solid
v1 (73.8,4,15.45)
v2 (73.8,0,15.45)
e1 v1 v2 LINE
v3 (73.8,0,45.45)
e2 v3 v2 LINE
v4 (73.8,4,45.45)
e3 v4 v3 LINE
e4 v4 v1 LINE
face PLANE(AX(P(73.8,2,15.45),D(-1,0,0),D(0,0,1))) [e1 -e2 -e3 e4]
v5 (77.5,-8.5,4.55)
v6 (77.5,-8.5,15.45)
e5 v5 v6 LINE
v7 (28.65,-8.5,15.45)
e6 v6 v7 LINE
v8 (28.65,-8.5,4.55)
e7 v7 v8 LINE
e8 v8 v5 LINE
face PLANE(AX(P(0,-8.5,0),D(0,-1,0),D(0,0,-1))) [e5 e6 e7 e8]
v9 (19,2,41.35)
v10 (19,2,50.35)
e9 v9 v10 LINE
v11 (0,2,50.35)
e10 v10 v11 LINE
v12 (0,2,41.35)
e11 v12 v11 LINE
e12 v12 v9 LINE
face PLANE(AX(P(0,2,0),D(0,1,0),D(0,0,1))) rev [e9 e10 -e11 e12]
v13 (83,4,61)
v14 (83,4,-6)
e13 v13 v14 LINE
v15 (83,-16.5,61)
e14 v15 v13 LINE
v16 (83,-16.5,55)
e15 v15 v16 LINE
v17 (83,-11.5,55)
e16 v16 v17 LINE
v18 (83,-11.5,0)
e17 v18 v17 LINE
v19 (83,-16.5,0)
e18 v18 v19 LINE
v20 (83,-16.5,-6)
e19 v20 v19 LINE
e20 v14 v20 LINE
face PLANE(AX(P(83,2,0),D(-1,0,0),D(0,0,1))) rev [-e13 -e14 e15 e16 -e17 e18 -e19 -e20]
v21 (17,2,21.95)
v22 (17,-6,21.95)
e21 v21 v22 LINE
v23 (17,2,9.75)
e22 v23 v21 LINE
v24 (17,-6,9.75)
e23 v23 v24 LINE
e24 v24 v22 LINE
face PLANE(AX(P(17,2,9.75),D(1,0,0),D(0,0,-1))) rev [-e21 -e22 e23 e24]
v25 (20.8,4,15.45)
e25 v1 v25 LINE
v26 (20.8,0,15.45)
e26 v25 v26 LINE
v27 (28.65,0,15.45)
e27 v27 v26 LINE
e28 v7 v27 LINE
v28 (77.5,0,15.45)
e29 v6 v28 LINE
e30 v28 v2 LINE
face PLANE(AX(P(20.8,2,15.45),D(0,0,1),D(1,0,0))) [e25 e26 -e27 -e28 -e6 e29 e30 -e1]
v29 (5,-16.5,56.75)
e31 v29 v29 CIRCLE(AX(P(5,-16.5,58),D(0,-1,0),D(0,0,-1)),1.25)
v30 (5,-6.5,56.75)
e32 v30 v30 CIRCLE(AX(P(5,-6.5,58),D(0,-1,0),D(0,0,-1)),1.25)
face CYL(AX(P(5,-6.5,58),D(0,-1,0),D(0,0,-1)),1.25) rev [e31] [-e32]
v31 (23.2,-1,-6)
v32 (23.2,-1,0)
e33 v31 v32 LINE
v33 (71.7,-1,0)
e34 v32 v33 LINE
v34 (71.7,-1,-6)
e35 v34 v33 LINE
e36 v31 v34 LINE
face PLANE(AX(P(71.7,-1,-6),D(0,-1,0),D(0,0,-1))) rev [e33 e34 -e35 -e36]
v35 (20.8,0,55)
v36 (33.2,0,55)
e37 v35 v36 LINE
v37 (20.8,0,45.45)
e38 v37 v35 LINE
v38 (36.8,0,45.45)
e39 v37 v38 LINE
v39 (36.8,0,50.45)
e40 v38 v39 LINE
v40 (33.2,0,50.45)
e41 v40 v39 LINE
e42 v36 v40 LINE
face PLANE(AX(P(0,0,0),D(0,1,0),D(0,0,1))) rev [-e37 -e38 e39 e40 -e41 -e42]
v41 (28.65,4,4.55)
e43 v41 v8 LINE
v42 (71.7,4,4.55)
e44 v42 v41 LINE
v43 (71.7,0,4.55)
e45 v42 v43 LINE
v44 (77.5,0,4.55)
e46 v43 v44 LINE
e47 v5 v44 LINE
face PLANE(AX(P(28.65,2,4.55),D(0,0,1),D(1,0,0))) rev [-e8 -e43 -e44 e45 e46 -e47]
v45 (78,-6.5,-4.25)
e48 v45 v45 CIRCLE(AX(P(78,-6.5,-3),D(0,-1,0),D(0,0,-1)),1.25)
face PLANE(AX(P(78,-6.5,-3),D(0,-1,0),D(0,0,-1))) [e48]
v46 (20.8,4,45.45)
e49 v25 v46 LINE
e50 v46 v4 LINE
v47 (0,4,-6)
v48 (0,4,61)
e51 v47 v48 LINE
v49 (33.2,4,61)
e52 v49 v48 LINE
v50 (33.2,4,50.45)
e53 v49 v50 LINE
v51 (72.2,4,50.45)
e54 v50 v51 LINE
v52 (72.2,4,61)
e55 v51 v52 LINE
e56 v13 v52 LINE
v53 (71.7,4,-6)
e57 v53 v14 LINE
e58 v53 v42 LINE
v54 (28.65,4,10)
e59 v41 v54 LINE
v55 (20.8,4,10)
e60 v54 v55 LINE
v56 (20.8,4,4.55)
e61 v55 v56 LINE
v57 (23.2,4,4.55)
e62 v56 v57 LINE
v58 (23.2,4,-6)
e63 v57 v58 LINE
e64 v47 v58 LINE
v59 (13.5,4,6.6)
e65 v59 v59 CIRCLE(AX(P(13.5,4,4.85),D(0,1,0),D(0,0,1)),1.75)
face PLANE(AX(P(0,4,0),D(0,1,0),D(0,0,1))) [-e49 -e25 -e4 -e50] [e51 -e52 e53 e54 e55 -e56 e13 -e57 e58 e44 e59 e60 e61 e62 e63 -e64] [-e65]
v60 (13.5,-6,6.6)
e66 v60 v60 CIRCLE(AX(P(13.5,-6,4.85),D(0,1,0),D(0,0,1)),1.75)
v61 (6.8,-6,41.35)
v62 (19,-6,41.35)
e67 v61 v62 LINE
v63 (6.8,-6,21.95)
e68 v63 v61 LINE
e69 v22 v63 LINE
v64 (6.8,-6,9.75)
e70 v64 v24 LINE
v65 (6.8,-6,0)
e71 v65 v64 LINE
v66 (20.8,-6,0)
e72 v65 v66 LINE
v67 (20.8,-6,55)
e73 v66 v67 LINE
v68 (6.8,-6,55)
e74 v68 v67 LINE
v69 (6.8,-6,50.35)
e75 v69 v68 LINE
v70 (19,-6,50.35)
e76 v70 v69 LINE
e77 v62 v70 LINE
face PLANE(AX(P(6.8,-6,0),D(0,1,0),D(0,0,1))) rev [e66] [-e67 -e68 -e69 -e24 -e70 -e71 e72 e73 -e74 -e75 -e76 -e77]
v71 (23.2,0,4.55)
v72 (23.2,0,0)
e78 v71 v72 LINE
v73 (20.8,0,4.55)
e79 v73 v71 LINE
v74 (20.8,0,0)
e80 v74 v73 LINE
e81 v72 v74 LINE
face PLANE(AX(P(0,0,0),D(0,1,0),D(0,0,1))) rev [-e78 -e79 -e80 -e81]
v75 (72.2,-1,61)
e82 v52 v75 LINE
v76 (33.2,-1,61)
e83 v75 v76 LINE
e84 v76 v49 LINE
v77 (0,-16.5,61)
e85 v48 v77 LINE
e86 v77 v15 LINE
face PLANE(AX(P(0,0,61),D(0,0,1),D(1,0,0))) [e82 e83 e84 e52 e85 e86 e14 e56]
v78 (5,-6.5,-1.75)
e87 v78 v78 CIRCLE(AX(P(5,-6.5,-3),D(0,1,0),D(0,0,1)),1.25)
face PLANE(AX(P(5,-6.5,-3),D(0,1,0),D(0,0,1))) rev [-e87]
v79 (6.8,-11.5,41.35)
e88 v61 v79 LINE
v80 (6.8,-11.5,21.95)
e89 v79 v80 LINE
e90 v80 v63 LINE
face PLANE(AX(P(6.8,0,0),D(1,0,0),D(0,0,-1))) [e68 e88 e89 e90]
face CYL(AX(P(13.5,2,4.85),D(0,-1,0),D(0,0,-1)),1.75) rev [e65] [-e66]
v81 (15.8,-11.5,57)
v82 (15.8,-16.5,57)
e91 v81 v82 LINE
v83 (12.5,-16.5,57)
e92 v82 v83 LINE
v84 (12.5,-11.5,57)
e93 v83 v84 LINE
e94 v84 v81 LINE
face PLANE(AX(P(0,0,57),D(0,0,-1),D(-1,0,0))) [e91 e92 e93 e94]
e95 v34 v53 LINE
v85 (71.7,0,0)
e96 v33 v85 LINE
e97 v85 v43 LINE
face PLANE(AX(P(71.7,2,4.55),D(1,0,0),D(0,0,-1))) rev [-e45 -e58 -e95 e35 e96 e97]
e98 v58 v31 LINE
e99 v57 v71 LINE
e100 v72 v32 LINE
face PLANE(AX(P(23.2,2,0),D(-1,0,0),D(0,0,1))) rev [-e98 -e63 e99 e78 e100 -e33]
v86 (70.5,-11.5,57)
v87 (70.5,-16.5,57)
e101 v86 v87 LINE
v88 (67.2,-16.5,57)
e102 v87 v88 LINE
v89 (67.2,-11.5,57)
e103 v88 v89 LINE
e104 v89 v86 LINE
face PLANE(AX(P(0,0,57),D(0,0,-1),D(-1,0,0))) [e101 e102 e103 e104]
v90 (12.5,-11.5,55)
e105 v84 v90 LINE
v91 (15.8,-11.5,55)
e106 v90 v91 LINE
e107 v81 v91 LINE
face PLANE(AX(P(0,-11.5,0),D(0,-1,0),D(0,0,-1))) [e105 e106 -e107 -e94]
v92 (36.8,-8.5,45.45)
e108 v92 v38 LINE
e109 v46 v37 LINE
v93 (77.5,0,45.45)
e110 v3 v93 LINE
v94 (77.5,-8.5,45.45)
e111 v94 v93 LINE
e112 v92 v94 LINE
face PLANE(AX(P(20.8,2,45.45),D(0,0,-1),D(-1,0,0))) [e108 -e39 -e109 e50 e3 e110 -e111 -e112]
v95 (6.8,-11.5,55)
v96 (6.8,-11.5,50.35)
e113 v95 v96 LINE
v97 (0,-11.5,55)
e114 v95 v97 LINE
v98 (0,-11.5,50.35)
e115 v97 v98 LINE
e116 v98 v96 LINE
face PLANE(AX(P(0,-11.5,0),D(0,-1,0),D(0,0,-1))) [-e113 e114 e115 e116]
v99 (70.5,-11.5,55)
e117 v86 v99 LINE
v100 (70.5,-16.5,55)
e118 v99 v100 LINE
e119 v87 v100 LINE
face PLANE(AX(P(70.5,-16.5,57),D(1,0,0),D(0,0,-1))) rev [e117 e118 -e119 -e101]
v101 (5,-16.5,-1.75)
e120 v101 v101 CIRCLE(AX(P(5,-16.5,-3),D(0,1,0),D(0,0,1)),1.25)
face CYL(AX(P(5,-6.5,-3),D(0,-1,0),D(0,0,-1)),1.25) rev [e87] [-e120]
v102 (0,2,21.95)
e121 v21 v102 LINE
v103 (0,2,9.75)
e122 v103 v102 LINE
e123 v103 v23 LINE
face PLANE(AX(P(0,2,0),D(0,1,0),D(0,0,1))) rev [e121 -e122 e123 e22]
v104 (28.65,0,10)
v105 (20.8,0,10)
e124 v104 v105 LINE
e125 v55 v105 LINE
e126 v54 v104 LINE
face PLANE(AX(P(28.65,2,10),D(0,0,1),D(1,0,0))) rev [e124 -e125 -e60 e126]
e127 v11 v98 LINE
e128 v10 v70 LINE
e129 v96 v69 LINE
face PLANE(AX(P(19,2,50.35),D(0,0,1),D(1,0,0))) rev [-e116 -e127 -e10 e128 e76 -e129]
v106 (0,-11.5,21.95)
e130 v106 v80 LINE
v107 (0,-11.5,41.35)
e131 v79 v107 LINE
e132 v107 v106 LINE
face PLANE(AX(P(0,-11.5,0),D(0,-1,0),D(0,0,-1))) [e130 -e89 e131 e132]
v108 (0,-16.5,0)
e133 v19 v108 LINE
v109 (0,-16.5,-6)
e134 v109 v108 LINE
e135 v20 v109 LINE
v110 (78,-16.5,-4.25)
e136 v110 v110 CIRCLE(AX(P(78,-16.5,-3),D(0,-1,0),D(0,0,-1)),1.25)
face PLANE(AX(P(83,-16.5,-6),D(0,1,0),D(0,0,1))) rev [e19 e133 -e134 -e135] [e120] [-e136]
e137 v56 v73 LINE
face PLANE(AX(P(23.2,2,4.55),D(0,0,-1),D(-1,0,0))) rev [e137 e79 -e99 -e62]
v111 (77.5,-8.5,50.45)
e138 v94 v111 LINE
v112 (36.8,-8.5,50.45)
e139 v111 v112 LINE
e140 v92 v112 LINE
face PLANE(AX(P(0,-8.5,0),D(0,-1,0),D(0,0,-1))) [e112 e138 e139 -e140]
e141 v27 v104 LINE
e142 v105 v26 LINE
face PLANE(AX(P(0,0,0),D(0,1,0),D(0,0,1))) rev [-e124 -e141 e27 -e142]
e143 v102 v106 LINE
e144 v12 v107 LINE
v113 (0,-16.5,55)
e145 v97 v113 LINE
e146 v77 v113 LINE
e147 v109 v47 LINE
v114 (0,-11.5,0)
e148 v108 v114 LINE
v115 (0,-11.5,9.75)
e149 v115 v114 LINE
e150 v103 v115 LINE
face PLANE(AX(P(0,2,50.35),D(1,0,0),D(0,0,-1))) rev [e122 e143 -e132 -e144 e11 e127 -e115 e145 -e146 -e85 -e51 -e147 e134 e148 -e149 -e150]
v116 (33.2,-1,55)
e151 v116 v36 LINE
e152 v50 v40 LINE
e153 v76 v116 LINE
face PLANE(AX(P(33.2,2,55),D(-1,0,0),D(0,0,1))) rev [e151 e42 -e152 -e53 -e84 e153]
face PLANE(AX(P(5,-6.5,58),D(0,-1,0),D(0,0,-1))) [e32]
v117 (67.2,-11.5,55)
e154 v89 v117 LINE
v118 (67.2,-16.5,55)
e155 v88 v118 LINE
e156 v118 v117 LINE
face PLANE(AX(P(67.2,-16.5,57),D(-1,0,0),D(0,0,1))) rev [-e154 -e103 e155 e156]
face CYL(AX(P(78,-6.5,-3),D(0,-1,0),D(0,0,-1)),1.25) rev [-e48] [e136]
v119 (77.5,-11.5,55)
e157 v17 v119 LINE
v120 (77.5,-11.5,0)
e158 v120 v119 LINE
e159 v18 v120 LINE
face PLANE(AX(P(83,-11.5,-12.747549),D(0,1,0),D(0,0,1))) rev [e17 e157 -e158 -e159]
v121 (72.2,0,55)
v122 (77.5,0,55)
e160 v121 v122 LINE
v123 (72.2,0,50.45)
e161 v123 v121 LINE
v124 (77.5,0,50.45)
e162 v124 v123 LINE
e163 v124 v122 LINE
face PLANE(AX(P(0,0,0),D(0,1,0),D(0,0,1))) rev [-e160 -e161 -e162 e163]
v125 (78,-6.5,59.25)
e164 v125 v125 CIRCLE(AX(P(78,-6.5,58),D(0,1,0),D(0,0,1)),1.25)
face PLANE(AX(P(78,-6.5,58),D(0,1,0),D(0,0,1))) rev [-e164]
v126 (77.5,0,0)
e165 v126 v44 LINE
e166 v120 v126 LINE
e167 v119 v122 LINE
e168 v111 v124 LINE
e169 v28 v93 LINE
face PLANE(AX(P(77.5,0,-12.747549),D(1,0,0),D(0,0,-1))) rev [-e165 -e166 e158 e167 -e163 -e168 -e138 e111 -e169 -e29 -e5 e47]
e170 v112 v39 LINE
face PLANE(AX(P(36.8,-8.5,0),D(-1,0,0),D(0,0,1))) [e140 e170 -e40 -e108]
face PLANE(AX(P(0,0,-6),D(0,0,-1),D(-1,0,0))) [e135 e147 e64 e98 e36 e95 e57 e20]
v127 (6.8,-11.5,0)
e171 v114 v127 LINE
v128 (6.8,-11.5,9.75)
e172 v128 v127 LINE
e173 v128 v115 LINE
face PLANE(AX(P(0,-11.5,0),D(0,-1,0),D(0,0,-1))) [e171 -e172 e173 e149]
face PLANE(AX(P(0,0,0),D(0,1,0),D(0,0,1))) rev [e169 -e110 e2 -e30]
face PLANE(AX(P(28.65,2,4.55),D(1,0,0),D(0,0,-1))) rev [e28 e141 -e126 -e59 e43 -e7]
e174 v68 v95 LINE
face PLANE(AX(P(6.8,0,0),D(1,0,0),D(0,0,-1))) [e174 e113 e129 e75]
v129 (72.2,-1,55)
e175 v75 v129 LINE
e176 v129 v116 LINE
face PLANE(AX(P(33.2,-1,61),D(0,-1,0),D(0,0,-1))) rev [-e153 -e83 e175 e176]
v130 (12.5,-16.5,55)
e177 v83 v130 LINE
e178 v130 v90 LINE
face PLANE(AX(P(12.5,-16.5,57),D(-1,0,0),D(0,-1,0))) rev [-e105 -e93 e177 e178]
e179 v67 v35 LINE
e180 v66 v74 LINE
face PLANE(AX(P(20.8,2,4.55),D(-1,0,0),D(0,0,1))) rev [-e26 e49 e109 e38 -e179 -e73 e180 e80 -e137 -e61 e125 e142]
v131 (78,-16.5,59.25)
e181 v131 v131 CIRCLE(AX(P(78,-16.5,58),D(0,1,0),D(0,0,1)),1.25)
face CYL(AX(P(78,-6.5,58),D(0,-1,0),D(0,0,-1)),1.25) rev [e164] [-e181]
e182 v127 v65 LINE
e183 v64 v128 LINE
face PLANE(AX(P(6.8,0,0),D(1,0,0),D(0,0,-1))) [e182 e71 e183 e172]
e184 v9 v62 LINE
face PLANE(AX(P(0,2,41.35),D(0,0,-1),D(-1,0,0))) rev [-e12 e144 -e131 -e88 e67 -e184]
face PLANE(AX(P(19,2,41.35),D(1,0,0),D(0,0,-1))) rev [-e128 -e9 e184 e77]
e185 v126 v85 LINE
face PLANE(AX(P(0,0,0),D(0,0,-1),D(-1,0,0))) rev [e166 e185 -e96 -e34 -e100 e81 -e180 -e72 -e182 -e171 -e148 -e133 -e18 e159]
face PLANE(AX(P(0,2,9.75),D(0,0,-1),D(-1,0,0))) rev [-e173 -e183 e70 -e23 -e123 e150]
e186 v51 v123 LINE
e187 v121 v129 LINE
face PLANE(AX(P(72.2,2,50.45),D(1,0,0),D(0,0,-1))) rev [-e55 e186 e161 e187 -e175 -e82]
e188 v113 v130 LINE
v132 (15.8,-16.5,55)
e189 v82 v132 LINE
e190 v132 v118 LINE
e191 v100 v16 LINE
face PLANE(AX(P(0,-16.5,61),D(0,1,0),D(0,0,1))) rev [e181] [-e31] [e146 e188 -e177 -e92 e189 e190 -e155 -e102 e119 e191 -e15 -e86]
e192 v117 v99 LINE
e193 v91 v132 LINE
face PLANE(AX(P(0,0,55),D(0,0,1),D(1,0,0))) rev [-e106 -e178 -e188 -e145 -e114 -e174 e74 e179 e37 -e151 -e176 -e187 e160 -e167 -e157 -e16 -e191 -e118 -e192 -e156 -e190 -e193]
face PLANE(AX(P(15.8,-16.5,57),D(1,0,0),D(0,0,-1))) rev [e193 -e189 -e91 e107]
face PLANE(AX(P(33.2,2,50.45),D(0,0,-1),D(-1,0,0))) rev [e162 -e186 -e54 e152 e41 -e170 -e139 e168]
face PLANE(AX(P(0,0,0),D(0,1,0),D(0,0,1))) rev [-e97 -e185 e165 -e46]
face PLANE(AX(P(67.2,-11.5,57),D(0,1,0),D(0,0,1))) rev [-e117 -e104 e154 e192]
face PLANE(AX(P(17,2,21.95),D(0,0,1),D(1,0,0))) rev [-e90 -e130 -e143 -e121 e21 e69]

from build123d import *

# Parameters (mm, degrees)
SKETCH1_R               = 1.75
SKETCH1_W               = 53
SKETCH1_H               = 30
BOSS_EXTRUDE1_DEPTH     = 2
BOSS_EXTRUDE2_OUTLINE_R = 1.75
BOSS_EXTRUDE2_DEPTH     = 11.5
SKETCH3_R               = 1.75
SKETCH3_W               = 53
SKETCH3_H               = 30
BOSS_EXTRUDE3_DEPTH     = 2
BOSS_EXTRUDE4_DEPTH     = 6
BOSS_EXTRUDE5_DEPTH     = 6
SKETCH7_W               = 3.3
SKETCH7_H               = 5
CUT_EXTRUDE3_DEPTH      = 2
SKETCH9_W               = 55
SKETCH9_H               = 5.5
CUT_EXTRUDE5_DEPTH      = 14
SKETCH10_W              = 5.5
SKETCH10_H              = 11.5
BOSS_EXTRUDE6_DEPTH     = 55
BOSS_EXTRUDE8_DEPTH     = 8.5
SKETCH14_R              = 1.25
CUT_EXTRUDE6_DEPTH      = 10


# Read off the part's stored shape, not the designer's step: Boss-Extrude2
with BuildPart() as part:
    # Sketch1 → Boss-Extrude1 (new body)
    with BuildSketch(Plane(origin=(0, 0, 0), x_dir=(1, 0, 0), z_dir=(0, 1, 0))):
        Polygon((0, 0), (23.2, 0), (23.2, -4.55), (20.8, -4.55), (20.8, -10), (28.65, -10), (28.65, -4.55), (71.7, -4.55), (71.7, 0), (83, 0), (83, -22.35), (83, -30.15), (83, -55), (72.2, -55), (72.2, -50.45), (33.2, -50.45), (33.2, -55), (0, -55), (0, -50.35), (19, -50.35), (19, -41.35), (0, -41.35), (0, -21.95), (17, -21.95), (17, -9.75), (0, -9.75), align=None)
        with Locations(Location((13.5, -4.85, 0), (0, 0, 270))):
            Circle(SKETCH1_R, mode=Mode.SUBTRACT)
        with Locations((47.3, -30.45)):
            Rectangle(SKETCH1_W, SKETCH1_H, mode=Mode.SUBTRACT)
    extrude(amount=BOSS_EXTRUDE1_DEPTH)

    # Boss-Extrude2 outline → Boss-Extrude2 (add)
    with BuildSketch(Plane.XZ):
        Polygon((0, 9.75), (0, 0), (20.8, 0), (20.8, 55), (0, 55), (0, 50.35), (19, 50.35), (19, 41.35), (0, 41.35), (0, 21.95), (17, 21.95), (17, 9.75), align=None)
        with Locations((13.5, 4.85)):
            Circle(BOSS_EXTRUDE2_OUTLINE_R, mode=Mode.SUBTRACT)
    extrude(amount=BOSS_EXTRUDE2_DEPTH)

    # Sketch3 → Boss-Extrude3 (add)
    with BuildSketch(Plane(origin=(0, 2, 0), x_dir=(1, 0, 0), z_dir=(0, 1, 0))):
        Polygon((23.2, 0), (0, 0), (0, -55), (33.2, -55), (33.2, -50.45), (72.2, -50.45), (72.2, -55), (83, -55), (83, 0), (71.7, 0), (71.7, -4.55), (28.65, -4.55), (28.65, -10), (20.8, -10), (20.8, -4.55), (23.2, -4.55), align=None)
        with Locations(Location((13.5, -4.85, 0), (0, 0, 90))):
            Circle(SKETCH3_R, mode=Mode.SUBTRACT)
        with Locations((47.3, -30.45)):
            Rectangle(SKETCH3_W, SKETCH3_H, mode=Mode.SUBTRACT)
    extrude(amount=BOSS_EXTRUDE3_DEPTH)

    # Sketch4 → Boss-Extrude4 (add)
    with BuildSketch(Plane.XY.offset(55)):
        Polygon((0, 4), (33.2, 4), (33.2, 0), (33.2, -1), (72.2, -1), (72.2, 0), (72.2, 4), (83, 4), (83, -11.5), (83, -16.5), (0, -16.5), (0, -11.5), align=None)
    extrude(amount=BOSS_EXTRUDE4_DEPTH)

    # Sketch5 → Boss-Extrude5 (add)
    with BuildSketch(Plane(origin=(0, 0, 0), x_dir=(-1, 0, 0), z_dir=(0, 0, -1))):
        Polygon((-23.2, 4), (-23.2, 0), (-23.2, -1), (-71.7, -1), (-71.7, 0), (-71.7, 4), (-83, 4), (-83, -11.5), (-83, -16.5), (0, -16.5), (0, -11.5), (0, 4), align=None)
    extrude(amount=BOSS_EXTRUDE5_DEPTH)

    # Sketch7 → Cut-Extrude3 (cut)
    with BuildSketch(Plane(origin=(0, 0, 55), x_dir=(-1, 0, 0), z_dir=(0, 0, -1))):
        with Locations((-14.15, -14)):
            Rectangle(SKETCH7_W, SKETCH7_H)
        with Locations((-68.85, -14)):
            Rectangle(SKETCH7_W, SKETCH7_H)
    extrude(amount=-CUT_EXTRUDE3_DEPTH, mode=Mode.SUBTRACT)

    # Sketch9 → Cut-Extrude5 (cut)
    with BuildSketch(Plane(origin=(20.8, 0, 0), x_dir=(0, 0, -1), z_dir=(1, 0, 0))):
        with Locations((-27.5, -8.75)):
            Rectangle(SKETCH9_W, SKETCH9_H)
    extrude(amount=-CUT_EXTRUDE5_DEPTH, mode=Mode.SUBTRACT)

    # Sketch10 → Boss-Extrude6 (add)
    with BuildSketch(Plane(origin=(0, 0, 55), x_dir=(-1, 0, 0), z_dir=(0, 0, -1))):
        with Locations((-80.25, -5.75)):
            Rectangle(SKETCH10_W, SKETCH10_H)
    extrude(amount=BOSS_EXTRUDE6_DEPTH)

    # Sketch12 → Boss-Extrude8 (add)
    with BuildSketch(Plane.XZ):
        Polygon((73.8, 45.45), (77.5, 45.45), (77.5, 50.45), (72.2, 50.45), (36.8, 50.45), (36.8, 45.45), align=None)
        Polygon((28.65, 10), (28.65, 4.55), (71.7, 4.55), (77.5, 4.55), (77.5, 15.45), (73.8, 15.45), (28.65, 15.45), align=None)
    extrude(amount=BOSS_EXTRUDE8_DEPTH)

    # Sketch14 → Cut-Extrude6 (cut)
    with BuildSketch(Plane.XZ.offset(16.5)):
        with Locations(Location((5, 58, 0), (0, 0, 270))):
            Circle(SKETCH14_R)
        with Locations(Location((78, 58, 0), (0, 0, 90))):
            Circle(SKETCH14_R)
        with Locations(Location((78, -3, 0), (0, 0, 270))):
            Circle(SKETCH14_R)
        with Locations(Location((5, -3, 0), (0, 0, 90))):
            Circle(SKETCH14_R)
    extrude(amount=-CUT_EXTRUDE6_DEPTH, mode=Mode.SUBTRACT)


solid = part.part
